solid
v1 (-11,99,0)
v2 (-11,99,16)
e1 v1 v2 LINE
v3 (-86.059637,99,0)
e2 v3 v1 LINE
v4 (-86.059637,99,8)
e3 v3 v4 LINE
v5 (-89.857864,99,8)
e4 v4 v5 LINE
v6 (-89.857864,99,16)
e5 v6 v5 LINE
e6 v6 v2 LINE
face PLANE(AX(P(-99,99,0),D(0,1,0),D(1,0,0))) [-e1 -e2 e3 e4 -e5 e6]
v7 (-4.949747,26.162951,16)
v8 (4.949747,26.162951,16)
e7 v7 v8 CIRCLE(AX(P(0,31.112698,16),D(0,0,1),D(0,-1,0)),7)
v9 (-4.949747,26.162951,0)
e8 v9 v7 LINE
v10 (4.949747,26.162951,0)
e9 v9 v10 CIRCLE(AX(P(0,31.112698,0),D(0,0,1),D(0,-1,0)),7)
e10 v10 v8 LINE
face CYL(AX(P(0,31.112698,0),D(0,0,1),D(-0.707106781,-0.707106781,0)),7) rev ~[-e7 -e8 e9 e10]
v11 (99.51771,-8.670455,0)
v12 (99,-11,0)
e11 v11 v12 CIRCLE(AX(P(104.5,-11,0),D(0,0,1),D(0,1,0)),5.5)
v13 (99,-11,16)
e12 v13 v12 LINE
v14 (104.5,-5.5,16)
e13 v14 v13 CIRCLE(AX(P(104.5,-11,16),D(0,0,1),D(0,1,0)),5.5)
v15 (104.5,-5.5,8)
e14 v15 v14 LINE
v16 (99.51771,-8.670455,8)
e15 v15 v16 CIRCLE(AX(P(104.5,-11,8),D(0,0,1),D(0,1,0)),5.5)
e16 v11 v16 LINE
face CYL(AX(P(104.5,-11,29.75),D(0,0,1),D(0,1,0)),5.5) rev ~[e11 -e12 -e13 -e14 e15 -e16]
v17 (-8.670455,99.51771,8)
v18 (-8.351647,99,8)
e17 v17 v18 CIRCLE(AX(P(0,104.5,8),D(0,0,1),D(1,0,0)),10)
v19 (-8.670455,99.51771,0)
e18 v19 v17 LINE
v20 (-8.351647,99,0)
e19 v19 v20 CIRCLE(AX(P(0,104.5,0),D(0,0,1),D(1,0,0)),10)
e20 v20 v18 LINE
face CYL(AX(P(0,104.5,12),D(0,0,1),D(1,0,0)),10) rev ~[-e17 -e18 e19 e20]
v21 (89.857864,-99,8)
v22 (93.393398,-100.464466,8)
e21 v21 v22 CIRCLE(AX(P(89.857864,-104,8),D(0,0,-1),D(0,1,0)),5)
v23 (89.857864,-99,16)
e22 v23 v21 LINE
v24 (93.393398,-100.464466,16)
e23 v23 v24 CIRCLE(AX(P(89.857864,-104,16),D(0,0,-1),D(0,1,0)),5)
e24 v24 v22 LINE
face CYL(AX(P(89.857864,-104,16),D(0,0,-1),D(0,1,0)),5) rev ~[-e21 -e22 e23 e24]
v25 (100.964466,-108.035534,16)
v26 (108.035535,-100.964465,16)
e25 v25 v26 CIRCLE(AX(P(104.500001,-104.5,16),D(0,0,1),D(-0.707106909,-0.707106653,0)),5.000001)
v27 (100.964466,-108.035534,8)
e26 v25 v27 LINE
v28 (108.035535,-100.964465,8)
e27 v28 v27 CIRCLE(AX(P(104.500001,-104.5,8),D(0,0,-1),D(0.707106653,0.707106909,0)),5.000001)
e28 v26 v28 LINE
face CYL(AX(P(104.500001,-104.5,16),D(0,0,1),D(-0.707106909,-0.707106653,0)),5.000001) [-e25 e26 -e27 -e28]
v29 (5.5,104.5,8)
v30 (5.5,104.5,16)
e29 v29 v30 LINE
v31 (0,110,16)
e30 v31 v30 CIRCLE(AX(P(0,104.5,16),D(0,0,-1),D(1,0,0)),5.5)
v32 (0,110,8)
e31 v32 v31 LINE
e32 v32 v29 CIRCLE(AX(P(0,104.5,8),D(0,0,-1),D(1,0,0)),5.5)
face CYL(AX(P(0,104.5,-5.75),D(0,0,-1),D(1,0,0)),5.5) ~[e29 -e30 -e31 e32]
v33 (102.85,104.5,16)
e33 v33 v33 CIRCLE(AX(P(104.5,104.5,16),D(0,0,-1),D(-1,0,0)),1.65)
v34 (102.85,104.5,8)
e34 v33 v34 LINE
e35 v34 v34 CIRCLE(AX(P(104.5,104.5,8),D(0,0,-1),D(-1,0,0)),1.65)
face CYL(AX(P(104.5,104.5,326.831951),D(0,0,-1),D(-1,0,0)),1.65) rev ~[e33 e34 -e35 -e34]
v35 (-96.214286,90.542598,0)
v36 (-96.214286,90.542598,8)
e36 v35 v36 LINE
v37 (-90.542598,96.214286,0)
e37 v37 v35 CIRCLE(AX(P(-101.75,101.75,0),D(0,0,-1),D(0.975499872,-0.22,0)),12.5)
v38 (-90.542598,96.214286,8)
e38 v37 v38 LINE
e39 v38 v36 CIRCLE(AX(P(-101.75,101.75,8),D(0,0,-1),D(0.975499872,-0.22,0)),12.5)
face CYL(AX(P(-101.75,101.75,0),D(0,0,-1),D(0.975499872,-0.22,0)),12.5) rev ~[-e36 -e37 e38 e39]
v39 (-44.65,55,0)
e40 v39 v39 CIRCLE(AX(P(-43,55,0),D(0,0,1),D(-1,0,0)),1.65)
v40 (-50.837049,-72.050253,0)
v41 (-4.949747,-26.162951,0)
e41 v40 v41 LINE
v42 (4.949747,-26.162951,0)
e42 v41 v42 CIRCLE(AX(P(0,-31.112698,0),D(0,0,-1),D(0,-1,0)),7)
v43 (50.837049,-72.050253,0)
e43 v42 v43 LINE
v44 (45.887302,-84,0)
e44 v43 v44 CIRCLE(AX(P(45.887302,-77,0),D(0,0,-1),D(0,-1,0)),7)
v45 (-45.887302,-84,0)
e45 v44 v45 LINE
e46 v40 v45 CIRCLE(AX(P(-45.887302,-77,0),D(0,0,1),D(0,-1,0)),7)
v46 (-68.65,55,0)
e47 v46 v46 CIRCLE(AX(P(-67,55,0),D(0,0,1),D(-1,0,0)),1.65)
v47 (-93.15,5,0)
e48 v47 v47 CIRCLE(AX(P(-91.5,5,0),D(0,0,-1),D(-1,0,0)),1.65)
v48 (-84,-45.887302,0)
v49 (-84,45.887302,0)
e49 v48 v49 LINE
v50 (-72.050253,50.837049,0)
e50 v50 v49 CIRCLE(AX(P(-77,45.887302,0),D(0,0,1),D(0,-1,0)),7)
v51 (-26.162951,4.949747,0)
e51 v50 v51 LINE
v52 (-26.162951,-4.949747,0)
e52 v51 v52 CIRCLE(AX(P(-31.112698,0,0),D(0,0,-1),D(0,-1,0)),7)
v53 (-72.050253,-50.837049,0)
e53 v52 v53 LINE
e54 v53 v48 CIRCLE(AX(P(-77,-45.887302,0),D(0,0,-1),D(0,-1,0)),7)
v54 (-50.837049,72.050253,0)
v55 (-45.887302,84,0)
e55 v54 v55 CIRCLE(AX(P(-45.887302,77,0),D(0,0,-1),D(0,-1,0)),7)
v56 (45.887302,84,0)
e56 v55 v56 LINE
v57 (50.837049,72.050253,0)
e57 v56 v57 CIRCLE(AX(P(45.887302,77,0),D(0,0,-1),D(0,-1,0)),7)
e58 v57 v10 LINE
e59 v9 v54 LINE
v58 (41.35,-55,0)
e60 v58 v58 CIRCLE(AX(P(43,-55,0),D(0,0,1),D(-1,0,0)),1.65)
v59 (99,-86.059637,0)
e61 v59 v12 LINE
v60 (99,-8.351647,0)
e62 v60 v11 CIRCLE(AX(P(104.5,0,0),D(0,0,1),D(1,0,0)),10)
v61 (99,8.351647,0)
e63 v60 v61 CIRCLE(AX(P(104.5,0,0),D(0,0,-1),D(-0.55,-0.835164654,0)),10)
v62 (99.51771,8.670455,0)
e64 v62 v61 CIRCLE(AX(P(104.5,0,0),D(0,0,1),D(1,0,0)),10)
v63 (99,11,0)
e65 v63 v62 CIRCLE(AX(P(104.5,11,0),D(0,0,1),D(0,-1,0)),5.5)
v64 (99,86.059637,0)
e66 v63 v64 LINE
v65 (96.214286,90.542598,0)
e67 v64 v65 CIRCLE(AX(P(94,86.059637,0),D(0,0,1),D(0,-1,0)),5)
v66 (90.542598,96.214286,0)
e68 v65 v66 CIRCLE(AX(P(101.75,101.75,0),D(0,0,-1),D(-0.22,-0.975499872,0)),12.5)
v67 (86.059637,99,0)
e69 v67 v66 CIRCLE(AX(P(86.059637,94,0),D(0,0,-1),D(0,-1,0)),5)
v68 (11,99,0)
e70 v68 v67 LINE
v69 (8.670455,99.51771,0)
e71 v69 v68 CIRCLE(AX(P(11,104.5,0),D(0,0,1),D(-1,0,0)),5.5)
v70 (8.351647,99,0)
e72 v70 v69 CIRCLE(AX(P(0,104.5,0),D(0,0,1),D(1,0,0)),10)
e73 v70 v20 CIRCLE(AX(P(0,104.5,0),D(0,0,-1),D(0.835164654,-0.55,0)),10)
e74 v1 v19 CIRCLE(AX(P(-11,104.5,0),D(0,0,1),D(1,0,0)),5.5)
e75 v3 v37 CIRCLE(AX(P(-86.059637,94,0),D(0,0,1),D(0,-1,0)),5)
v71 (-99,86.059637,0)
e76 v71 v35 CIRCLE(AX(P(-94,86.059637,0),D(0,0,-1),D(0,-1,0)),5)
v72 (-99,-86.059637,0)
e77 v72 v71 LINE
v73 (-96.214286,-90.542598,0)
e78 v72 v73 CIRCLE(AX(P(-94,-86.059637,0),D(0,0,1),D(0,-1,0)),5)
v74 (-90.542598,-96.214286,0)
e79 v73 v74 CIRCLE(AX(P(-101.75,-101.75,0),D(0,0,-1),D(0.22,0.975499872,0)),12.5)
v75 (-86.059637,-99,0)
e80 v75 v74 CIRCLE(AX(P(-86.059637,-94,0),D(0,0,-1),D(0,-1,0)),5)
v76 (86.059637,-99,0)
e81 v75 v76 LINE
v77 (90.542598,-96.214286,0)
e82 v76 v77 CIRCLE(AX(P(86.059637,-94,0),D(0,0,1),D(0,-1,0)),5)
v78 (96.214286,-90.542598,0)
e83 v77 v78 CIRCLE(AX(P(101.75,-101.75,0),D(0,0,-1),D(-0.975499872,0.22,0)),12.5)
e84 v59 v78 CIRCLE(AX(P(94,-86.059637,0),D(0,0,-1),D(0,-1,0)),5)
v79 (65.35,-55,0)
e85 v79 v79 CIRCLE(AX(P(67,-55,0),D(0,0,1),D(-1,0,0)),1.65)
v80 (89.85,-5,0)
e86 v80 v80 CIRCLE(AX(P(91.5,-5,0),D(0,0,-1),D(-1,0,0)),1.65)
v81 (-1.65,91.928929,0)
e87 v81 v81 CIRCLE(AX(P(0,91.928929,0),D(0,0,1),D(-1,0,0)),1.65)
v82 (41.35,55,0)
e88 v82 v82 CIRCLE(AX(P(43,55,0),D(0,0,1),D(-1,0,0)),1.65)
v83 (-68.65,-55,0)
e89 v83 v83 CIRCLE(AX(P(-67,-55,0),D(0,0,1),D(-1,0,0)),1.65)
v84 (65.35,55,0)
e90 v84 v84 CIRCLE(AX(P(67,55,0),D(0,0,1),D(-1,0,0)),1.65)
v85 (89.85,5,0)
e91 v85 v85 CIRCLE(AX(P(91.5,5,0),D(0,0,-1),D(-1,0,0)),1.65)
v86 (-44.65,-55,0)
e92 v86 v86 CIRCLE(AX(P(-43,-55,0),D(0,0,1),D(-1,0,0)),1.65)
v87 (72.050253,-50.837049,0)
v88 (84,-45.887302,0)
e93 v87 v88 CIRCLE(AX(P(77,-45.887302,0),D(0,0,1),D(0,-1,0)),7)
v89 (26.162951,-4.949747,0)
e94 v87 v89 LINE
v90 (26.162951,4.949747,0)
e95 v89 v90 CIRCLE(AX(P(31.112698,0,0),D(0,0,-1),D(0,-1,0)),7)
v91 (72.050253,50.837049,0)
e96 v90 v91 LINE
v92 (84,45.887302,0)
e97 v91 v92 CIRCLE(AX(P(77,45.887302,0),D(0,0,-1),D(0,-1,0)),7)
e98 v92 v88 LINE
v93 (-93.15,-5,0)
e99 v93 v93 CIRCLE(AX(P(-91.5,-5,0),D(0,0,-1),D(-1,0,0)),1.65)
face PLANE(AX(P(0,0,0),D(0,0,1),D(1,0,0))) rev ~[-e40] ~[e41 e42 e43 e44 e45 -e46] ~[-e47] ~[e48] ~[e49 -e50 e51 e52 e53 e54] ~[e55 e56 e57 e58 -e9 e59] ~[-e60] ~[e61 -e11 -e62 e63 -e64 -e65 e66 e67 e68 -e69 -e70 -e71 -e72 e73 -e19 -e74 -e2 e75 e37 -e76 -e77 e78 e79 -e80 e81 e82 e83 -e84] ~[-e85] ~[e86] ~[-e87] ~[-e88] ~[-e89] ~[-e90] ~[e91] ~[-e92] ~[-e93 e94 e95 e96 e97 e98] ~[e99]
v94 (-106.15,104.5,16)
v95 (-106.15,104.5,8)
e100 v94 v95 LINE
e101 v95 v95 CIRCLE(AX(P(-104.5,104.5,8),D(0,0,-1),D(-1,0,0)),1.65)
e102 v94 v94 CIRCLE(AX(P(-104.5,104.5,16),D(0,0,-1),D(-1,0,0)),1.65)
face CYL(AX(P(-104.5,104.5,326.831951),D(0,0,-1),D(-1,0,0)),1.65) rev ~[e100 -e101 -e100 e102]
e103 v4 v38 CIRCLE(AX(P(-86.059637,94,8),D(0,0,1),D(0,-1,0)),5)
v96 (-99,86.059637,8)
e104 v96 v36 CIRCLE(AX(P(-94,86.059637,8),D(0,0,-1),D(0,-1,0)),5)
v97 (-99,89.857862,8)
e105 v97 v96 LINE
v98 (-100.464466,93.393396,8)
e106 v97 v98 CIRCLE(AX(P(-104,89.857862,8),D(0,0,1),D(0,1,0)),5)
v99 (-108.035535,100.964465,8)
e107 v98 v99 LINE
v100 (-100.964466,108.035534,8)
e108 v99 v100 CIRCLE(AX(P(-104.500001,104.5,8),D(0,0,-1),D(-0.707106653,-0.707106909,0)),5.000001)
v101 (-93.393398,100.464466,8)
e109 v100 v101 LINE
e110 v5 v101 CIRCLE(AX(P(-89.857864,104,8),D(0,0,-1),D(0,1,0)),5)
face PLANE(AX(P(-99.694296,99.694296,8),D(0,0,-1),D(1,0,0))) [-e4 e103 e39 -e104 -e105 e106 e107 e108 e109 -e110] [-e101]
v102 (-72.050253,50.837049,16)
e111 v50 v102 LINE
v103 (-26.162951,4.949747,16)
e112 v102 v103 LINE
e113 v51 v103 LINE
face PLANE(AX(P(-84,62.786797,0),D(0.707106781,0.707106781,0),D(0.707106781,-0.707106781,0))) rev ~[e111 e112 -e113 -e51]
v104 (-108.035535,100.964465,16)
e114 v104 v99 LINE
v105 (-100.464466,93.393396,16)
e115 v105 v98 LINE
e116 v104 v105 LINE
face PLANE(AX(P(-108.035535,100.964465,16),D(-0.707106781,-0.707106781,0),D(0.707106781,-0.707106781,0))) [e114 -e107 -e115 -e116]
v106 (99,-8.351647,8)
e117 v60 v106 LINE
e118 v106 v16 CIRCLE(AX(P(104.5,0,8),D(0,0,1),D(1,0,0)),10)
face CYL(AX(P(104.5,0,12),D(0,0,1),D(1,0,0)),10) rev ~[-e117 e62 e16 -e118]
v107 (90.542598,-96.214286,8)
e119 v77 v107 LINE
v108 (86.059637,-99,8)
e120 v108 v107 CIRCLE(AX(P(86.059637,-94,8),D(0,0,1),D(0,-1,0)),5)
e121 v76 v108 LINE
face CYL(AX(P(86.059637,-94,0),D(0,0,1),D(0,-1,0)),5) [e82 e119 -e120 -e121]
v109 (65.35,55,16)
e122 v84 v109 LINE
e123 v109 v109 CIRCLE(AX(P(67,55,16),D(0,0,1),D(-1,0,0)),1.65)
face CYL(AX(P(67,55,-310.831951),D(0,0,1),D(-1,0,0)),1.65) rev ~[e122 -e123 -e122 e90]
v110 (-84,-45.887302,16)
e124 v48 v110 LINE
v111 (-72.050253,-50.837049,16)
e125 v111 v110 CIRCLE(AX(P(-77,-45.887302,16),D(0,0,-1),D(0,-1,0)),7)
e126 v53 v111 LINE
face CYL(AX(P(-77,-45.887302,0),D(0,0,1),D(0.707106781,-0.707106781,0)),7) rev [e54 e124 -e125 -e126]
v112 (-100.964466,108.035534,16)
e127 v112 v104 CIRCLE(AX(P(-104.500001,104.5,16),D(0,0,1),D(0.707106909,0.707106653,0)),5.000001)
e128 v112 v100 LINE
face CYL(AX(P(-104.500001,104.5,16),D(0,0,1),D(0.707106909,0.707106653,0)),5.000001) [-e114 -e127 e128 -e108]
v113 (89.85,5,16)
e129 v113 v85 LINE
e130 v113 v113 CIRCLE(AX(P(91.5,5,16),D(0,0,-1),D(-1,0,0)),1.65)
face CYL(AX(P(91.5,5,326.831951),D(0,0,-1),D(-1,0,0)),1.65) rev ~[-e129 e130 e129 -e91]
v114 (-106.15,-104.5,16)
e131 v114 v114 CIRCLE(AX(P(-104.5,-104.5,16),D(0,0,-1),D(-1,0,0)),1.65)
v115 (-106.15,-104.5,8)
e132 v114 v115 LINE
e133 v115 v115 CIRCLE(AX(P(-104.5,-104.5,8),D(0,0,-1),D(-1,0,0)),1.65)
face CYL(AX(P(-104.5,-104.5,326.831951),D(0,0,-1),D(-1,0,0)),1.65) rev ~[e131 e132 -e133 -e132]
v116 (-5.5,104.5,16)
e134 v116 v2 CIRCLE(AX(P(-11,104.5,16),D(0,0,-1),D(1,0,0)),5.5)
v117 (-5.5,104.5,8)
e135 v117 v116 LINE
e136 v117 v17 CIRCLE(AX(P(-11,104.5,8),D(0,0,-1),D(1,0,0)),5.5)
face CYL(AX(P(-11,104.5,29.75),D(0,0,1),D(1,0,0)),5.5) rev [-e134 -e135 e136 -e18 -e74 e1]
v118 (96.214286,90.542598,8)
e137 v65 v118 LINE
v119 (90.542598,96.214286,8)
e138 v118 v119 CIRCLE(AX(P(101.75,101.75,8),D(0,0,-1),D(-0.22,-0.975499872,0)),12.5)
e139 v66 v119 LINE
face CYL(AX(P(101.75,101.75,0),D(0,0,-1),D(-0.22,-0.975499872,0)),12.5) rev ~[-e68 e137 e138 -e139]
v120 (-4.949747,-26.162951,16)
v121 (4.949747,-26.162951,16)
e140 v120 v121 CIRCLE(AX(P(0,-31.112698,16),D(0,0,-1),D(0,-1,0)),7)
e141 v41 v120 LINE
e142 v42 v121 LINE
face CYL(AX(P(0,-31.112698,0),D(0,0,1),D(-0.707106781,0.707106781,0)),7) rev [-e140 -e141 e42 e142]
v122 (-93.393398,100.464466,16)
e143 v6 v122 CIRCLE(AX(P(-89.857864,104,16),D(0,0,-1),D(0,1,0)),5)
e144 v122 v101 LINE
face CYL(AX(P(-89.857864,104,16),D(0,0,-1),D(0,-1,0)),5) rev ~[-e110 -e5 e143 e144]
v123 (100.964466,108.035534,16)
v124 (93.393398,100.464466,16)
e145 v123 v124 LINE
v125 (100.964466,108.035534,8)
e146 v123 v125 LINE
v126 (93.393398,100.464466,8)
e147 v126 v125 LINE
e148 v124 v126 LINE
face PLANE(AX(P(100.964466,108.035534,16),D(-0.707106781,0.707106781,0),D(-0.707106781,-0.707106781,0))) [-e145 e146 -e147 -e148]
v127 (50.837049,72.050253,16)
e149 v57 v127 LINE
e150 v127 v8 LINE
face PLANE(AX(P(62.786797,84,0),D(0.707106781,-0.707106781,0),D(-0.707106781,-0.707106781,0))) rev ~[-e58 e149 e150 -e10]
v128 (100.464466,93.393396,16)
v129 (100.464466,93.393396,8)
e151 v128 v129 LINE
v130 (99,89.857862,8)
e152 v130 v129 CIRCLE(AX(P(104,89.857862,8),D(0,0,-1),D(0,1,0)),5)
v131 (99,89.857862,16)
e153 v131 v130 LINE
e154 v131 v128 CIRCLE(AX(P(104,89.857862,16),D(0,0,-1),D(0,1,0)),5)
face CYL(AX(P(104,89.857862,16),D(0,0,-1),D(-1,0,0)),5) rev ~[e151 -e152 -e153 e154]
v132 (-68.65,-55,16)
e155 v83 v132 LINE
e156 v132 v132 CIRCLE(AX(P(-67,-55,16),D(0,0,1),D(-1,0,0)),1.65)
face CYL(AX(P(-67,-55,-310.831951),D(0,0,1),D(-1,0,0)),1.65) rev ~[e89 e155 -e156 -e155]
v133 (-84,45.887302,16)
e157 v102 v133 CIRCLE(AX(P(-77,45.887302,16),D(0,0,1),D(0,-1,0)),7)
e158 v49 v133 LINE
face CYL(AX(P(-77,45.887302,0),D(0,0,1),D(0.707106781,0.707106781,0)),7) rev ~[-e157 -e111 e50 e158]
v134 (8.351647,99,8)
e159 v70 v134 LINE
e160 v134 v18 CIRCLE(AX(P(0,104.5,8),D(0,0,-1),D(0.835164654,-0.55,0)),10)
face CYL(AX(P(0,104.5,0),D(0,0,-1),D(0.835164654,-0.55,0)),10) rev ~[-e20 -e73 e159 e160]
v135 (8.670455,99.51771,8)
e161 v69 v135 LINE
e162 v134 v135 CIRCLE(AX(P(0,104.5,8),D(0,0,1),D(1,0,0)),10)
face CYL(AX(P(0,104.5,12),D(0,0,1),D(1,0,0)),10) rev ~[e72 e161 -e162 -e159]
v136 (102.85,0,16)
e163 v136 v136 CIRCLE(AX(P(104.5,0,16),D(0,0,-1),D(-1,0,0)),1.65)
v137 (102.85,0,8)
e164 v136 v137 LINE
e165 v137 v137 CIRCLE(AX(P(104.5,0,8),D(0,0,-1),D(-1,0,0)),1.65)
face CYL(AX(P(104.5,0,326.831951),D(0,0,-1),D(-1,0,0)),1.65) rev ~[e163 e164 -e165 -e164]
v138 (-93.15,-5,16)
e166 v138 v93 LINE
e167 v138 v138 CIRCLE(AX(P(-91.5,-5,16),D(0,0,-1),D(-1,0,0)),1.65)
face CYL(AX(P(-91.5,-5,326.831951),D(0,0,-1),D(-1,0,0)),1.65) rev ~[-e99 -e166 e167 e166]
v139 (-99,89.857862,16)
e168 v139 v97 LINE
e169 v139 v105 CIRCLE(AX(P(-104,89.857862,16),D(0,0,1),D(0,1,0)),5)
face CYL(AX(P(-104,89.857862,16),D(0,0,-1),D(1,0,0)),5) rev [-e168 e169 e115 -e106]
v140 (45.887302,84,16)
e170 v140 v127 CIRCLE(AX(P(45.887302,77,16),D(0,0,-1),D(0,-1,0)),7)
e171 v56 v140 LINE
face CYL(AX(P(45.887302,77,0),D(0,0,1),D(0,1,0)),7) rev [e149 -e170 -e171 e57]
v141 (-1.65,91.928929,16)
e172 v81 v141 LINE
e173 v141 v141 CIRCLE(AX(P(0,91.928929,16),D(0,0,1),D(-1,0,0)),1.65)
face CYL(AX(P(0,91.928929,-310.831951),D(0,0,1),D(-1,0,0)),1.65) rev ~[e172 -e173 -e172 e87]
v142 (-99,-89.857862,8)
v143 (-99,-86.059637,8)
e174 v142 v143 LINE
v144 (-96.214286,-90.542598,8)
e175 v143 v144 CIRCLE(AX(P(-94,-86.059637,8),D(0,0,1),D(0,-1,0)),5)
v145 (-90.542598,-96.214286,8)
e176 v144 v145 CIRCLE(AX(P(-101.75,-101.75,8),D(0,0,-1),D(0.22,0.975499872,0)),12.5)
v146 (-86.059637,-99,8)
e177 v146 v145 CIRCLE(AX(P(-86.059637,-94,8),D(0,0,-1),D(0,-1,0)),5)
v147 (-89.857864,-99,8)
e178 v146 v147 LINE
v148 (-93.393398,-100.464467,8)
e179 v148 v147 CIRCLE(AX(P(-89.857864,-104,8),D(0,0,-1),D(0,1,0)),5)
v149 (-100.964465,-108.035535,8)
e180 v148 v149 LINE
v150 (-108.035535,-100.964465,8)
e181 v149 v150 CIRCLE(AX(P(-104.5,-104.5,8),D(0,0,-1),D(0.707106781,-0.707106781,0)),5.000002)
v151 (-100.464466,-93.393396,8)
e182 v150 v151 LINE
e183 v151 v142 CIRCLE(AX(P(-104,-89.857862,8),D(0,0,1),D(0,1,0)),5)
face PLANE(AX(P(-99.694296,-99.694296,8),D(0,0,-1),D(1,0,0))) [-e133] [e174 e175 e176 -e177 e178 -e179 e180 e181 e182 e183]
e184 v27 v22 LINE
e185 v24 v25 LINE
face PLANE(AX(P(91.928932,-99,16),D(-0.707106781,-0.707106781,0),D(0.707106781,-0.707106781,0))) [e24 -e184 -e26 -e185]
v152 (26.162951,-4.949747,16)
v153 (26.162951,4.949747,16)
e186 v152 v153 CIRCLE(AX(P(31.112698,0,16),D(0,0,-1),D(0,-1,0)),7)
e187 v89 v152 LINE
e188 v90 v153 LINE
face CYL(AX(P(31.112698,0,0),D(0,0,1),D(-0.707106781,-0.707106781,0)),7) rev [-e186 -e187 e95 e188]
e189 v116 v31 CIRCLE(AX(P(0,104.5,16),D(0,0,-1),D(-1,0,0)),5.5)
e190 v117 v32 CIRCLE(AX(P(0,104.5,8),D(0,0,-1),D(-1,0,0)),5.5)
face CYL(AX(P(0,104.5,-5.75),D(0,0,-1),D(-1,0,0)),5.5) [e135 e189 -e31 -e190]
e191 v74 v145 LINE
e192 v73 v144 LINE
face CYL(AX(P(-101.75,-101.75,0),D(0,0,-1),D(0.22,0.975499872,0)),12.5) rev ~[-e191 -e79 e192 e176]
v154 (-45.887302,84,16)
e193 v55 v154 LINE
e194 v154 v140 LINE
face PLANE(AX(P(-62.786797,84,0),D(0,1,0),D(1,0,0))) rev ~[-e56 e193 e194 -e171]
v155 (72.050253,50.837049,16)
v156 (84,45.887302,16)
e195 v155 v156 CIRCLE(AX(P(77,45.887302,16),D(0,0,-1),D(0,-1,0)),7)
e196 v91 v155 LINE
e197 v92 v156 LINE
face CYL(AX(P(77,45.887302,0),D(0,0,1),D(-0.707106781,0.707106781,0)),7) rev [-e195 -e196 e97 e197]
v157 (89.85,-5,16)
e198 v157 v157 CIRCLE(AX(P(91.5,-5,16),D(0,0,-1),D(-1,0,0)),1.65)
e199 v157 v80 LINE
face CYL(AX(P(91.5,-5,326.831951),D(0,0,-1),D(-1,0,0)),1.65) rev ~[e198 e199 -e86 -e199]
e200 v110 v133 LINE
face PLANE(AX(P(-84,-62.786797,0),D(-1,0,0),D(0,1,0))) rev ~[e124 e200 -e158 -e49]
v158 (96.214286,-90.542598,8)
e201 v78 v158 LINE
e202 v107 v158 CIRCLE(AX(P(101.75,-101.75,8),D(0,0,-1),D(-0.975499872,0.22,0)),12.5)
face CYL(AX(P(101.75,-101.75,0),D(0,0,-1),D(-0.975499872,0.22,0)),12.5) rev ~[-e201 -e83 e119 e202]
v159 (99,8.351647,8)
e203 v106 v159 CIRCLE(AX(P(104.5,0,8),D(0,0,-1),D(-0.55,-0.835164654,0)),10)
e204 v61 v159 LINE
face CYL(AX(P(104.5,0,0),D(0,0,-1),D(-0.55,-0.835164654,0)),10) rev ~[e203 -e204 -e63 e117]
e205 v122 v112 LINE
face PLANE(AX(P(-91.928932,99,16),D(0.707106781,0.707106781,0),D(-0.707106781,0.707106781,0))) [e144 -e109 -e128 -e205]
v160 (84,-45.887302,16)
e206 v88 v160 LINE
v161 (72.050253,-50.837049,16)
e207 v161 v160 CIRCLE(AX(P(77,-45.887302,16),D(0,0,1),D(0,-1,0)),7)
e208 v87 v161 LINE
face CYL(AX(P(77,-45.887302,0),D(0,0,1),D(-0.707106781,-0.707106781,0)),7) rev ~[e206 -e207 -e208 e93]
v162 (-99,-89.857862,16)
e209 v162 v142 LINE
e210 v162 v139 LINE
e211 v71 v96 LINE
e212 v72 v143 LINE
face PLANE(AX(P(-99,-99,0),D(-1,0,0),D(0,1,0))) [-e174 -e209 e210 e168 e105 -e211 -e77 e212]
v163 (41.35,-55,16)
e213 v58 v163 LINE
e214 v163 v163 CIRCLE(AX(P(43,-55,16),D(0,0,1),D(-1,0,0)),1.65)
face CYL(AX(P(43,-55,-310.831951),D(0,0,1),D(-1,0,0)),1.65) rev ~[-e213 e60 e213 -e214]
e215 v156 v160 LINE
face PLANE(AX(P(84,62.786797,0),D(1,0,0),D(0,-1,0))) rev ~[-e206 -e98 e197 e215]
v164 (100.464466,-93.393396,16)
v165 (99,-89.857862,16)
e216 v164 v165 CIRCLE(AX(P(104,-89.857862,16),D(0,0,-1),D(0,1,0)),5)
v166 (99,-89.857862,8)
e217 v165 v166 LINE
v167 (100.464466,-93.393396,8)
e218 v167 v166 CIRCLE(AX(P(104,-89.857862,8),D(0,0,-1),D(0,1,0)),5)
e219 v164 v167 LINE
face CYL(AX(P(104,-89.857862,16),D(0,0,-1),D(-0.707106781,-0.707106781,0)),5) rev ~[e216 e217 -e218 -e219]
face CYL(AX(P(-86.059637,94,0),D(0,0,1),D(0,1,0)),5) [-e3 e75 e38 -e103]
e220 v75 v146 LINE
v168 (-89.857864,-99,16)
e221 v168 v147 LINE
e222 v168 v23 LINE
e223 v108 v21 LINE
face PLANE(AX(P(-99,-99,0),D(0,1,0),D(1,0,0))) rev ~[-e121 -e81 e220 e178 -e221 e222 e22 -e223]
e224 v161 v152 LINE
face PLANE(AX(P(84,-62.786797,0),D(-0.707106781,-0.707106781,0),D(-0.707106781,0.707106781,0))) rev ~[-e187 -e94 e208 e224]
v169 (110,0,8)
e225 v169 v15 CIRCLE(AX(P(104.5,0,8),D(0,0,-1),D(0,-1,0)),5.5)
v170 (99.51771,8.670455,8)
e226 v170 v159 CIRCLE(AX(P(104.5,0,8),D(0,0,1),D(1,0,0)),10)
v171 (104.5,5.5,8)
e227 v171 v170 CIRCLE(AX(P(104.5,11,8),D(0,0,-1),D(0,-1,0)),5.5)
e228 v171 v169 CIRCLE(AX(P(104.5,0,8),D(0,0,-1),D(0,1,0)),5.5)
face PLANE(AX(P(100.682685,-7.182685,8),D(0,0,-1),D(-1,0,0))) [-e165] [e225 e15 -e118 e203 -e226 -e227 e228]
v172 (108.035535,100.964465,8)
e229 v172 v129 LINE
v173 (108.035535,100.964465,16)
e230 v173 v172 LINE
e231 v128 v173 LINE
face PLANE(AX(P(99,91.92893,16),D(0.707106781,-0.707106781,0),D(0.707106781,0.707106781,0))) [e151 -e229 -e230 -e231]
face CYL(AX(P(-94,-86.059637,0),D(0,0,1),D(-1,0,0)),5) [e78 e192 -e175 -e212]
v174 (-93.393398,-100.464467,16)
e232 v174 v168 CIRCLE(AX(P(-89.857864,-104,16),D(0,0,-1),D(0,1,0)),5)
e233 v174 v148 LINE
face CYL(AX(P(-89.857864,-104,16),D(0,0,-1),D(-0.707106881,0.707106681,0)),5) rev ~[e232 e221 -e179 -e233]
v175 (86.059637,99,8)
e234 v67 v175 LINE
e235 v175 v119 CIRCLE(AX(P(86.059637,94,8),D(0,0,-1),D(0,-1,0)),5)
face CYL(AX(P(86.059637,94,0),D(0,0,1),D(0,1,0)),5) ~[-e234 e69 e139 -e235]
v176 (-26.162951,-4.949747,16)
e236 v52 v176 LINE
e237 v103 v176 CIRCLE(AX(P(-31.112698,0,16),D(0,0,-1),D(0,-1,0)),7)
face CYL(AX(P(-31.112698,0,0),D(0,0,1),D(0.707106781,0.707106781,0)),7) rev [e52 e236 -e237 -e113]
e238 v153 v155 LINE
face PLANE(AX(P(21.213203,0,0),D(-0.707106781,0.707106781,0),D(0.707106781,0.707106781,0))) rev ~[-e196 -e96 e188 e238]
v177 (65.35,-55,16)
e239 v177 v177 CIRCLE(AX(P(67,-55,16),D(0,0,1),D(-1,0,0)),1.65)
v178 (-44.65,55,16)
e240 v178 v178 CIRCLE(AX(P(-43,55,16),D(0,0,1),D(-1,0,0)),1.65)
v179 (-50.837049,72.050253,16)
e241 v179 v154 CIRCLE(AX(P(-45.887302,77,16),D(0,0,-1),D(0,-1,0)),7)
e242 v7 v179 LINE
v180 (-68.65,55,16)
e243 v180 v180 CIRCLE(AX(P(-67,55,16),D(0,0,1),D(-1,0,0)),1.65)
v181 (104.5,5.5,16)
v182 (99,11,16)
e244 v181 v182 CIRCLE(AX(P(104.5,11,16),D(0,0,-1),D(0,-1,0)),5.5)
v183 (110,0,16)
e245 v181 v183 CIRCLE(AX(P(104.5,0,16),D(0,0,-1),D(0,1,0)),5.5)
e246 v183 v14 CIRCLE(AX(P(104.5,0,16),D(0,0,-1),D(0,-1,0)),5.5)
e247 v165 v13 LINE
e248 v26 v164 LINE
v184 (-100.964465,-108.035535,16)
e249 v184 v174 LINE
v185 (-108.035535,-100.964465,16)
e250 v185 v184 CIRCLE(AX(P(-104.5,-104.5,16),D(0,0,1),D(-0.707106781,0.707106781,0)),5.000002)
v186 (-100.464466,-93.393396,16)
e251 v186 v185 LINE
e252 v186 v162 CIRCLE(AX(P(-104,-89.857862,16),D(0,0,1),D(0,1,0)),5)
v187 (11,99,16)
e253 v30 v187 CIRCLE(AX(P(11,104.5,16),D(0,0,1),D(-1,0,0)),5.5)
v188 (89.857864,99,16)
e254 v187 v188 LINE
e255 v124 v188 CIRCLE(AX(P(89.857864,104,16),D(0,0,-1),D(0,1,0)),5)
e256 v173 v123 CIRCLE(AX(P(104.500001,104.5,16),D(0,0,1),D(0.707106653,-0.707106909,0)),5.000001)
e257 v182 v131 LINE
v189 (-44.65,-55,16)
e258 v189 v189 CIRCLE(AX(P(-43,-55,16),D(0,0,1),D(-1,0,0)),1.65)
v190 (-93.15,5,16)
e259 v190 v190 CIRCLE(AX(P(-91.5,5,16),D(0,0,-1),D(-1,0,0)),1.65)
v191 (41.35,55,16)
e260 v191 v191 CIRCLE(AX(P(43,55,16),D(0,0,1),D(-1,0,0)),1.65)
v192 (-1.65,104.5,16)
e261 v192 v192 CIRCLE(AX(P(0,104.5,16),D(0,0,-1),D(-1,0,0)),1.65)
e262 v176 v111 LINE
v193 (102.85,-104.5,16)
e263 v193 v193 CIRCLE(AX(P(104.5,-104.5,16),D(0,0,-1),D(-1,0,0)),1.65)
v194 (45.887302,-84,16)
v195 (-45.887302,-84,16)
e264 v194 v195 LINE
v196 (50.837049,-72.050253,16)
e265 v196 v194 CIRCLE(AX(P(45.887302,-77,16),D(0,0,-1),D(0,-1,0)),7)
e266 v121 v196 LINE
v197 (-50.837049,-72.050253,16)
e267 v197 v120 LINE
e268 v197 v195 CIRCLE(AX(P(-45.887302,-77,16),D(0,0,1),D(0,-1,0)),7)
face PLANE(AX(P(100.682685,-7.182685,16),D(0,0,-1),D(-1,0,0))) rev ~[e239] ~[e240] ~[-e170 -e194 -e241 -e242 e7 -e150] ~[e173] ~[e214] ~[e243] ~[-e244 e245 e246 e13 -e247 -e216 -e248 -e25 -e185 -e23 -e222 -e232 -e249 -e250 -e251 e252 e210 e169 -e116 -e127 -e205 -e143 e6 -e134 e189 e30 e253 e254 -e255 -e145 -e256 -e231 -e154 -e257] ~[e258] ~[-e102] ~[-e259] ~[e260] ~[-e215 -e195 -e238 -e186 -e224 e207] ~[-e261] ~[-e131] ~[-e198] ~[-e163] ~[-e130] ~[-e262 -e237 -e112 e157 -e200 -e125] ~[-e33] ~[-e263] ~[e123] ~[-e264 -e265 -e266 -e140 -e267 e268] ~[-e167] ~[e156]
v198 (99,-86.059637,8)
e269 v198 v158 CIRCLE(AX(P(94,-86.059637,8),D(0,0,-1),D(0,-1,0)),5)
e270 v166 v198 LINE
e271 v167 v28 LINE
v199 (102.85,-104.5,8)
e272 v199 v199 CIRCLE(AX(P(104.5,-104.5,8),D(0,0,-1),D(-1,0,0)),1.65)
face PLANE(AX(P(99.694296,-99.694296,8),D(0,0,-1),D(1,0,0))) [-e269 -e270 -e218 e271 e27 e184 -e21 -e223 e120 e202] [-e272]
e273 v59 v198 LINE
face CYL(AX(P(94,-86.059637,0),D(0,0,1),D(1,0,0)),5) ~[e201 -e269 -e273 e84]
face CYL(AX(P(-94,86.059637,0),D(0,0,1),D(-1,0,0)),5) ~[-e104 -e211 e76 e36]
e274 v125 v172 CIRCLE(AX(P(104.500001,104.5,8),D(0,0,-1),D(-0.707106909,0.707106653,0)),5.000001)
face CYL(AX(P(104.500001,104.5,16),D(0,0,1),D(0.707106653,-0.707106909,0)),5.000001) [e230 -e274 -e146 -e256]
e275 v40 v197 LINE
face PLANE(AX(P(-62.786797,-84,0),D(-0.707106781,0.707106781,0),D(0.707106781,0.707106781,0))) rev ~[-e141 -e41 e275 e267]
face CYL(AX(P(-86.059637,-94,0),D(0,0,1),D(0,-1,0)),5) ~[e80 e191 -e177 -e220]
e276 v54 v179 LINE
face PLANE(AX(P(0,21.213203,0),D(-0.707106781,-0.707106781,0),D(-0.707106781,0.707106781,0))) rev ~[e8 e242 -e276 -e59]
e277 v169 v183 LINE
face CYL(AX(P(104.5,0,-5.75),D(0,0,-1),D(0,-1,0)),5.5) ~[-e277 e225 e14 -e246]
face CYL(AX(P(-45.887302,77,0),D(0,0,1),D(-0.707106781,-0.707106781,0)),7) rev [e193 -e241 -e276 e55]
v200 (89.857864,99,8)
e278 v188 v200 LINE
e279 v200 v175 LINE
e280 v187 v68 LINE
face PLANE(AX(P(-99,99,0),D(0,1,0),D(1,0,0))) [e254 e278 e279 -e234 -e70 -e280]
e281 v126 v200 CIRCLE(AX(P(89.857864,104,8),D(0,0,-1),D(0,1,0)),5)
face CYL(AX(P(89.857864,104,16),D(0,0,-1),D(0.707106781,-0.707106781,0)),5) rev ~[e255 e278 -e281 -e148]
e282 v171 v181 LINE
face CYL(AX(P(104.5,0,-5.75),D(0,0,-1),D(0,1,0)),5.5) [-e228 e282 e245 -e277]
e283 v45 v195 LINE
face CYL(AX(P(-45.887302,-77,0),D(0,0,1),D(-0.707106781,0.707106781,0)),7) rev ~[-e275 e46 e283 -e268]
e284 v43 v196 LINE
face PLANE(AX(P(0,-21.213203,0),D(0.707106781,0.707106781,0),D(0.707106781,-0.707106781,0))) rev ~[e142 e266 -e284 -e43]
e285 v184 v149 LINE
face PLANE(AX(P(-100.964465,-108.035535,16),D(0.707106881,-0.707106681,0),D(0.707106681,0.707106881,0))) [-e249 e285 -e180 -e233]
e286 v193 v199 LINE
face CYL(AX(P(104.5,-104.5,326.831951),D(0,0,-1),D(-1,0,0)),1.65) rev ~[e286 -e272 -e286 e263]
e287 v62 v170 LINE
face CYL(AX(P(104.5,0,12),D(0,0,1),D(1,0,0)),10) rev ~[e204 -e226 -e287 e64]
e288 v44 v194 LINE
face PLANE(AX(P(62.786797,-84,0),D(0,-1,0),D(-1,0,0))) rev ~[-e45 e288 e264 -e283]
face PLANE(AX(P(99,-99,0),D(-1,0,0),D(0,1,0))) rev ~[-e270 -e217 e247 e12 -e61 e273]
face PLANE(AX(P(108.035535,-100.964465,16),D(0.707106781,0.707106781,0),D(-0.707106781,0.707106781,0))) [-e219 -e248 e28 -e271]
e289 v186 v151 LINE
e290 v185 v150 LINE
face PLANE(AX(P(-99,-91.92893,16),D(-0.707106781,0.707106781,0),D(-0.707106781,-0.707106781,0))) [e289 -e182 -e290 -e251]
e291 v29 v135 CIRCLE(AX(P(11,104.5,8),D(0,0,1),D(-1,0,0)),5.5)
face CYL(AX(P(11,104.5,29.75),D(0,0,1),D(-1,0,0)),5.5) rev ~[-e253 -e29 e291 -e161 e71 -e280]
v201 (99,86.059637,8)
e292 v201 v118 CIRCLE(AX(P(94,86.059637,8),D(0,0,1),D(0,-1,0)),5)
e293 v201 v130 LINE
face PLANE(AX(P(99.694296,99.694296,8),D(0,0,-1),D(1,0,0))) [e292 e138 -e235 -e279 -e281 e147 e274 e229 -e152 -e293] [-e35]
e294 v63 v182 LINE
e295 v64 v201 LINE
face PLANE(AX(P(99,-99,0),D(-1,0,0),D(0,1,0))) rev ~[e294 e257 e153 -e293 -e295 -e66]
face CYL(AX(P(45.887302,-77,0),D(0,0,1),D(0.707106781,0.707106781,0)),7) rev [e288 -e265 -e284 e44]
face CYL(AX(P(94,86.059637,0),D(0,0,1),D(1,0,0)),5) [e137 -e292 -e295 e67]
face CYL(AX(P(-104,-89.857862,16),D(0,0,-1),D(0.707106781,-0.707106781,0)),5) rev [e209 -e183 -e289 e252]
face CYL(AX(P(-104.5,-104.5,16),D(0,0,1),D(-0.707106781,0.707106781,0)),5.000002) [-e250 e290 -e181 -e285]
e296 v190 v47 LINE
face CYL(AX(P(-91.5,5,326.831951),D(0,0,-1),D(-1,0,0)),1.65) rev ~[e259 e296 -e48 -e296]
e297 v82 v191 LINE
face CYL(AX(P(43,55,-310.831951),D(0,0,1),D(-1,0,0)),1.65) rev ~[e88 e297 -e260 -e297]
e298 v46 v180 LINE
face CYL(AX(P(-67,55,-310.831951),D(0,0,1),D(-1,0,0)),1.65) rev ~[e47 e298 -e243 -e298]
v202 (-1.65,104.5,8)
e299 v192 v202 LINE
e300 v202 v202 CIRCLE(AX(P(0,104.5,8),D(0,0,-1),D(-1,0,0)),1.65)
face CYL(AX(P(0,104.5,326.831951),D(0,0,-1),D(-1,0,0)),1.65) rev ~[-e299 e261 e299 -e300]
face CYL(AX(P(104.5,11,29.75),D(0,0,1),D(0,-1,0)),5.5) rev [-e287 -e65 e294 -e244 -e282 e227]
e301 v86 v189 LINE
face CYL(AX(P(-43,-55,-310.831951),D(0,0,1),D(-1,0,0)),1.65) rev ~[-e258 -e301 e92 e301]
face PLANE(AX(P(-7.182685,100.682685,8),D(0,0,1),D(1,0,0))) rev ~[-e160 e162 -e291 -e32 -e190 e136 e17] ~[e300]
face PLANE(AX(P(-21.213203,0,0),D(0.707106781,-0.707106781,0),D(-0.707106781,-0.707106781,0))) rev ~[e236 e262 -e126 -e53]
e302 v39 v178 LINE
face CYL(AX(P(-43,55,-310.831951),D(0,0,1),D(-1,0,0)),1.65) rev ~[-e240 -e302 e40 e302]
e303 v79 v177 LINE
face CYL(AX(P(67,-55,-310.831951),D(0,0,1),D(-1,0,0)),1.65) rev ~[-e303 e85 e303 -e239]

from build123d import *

# Parameters (mm, degrees)
F0_W         = 198
F0_H         = 198
F1_DEPTH     = 16
F2_W         = 11
F2_H         = 11
F3_DEPTH     = 16
F5_DEPTH     = 8
F6_R         = 5
F7_R         = 7
F8_T1_DEPTH  = 35.5
F8_T3_DEPTH  = 8
F8_T8_DEPTH  = 35.5
F8_S11_R     = 10
F8_T12_DEPTH = 20
F8_T16_DEPTH = 35.5
F8_S19_R     = 10
F8_T20_DEPTH = 20
F8_T24_DEPTH = 35.5
F8_S27_R     = 10
F8_T28_DEPTH = 20
F8_T32_DEPTH = 35.5
F8_S35_R     = 10
F8_T36_DEPTH = 20
F9_D         = 3.3
F10_D        = 3.3
F11_D        = 3.3


# Not quite as in the source:
# - a fillet or chamfer that OpenCascade refuses, or shapes differently, is made with other operations: its cross-section is extruded or revolved along the edge and cut away or added
# - ends of sketch curves that miss each other by under 0.0002 mm in the source are joined
# - a feature names something its author has since deleted; it is built from what else it names


with BuildPart() as f1:
    # F0 (on Top) → F1 (new body)
    with BuildSketch(Plane.XY):
        Rectangle(F0_W, F0_H)
        Polygon((-62.7867965644, -84), (0, -21.2132034356), (62.7867965644, -84), align=None, mode=Mode.SUBTRACT)
        Polygon((84, -62.7867965644), (21.2132034356, 0), (84, 62.7867965644), align=None, mode=Mode.SUBTRACT)
        Polygon((-84, 62.7867965644), (-21.2132034356, 0), (-84, -62.7867965644), align=None, mode=Mode.SUBTRACT)
        Polygon((62.7867965644, 84), (0, 21.2132034356), (-62.7867965644, 84), align=None, mode=Mode.SUBTRACT)
    extrude(amount=F1_DEPTH)

    # F2 (on face) → F3 (join, through all)
    with BuildSketch(Plane.XY.offset(16)):
        with BuildLine():
            Line((-99, -99), (-99, -91.9289296269))
            Line((-99, -91.9289296269), (-108.0355351865, -100.9644648135))
            ThreePointArc((-108.0355351865, -100.9644648135), (-108.0355351865, -108.0355351865), (-100.9644648135, -108.0355351865))
            Line((-100.9644648135, -108.0355351865), (-91.9289321881, -99))
            Line((-91.9289321881, -99), (-99, -99))
        make_face()
        with BuildLine():
            Line((99, -99), (91.9289321881, -99))
            Line((91.9289321881, -99), (100.9644660941, -108.0355339059))
            ThreePointArc((100.9644660941, -108.0355339059), (108.0355351865, -108.0355351865), (108.0355351865, -100.9644648135))
            Line((108.0355351865, -100.9644648135), (99, -91.9289296269))
            Line((99, -91.9289296269), (99, -99))
        make_face()
        with Locations((104.5, 0)):
            Rectangle(F2_W, F2_H)
        with BuildLine():
            Line((100.9644660941, 108.0355339059), (91.9289321881, 99))
            Line((91.9289321881, 99), (99, 99))
            Line((99, 99), (99, 91.9289296269))
            Line((99, 91.9289296269), (108.0355351865, 100.9644648135))
            ThreePointArc((108.0355351865, 100.9644648135), (108.0355351865, 108.0355351865), (100.9644660941, 108.0355339059))
        make_face()
        with BuildLine():
            Line((-99, 99), (-91.9289321881, 99))
            Line((-91.9289321881, 99), (-100.9644660941, 108.0355339059))
            ThreePointArc((-100.9644660941, 108.0355339059), (-108.0355351865, 108.0355351865), (-108.0355351865, 100.9644648135))
            Line((-108.0355351865, 100.9644648135), (-99, 91.9289296269))
            Line((-99, 91.9289296269), (-99, 99))
        make_face()
        with Locations((0, 104.5)):
            Rectangle(F2_W, F2_H)
    extrude(amount=-F3_DEPTH)

    # F4 (on face) → F5 (cut)
    with BuildSketch(Plane(origin=(0, 0, 0), x_dir=(1, 0, 0), z_dir=(0, 0, -1))):
        with BuildLine():
            Line((-99, 91.9289296269), (-99, 89.5562516017))
            ThreePointArc((-99, 89.5562516017), (-92.9111652352, 92.9111652352), (-89.5562516017, 99))
            Line((-89.5562516017, 99), (-91.9289321881, 99))
            Line((-91.9289321881, 99), (-100.9644648135, 108.0355351865))
            ThreePointArc((-100.9644648135, 108.0355351865), (-108.0355351865, 108.0355351865), (-108.0355351865, 100.9644648135))
            Line((-108.0355351865, 100.9644648135), (-99, 91.9289296269))
        make_face()
        with BuildLine():
            Line((91.9289321881, 99), (89.5562516017, 99))
            ThreePointArc((89.5562516017, 99), (92.9111652352, 92.9111652352), (99, 89.5562516017))
            Line((99, 89.5562516017), (99, 91.9289296269))
            Line((99, 91.9289296269), (108.0355351865, 100.9644648135))
            ThreePointArc((108.0355351865, 100.9644648135), (108.0355358268, 108.0355345462), (100.9644660941, 108.0355339059))
            Line((100.9644660941, 108.0355339059), (91.9289321881, 99))
        make_face()
        with BuildLine():
            ThreePointArc((-89.5562516017, -99), (-92.9111652352, -92.9111652352), (-99, -89.5562516017))
            Line((-99, -89.5562516017), (-99, -91.9289296269))
            Line((-99, -91.9289296269), (-108.0355351865, -100.9644648135))
            ThreePointArc((-108.0355351865, -100.9644648135), (-108.0355358268, -108.0355345462), (-100.9644660941, -108.0355339059))
            Line((-100.9644660941, -108.0355339059), (-91.9289321881, -99))
            Line((-91.9289321881, -99), (-89.5562516017, -99))
        make_face()
        with BuildLine():
            Line((99, 5.5), (99, 8.3516465442))
            ThreePointArc((99, 8.3516465442), (94.5, 0), (99, -8.3516465442))
            Line((99, -8.3516465442), (99, -5.5))
            Line((99, -5.5), (110, -5.5))
            Line((110, -5.5), (110, 5.5))
            Line((110, 5.5), (99, 5.5))
        make_face()
        with BuildLine():
            ThreePointArc((114.5, 0), (109.2434164903, 8.8034084308), (99, 8.3516465442))
            Line((99, 8.3516465442), (99, 5.5))
            Line((99, 5.5), (110, 5.5))
            Line((110, 5.5), (110, -5.5))
            Line((110, -5.5), (99, -5.5))
            Line((99, -5.5), (99, -8.3516465442))
            ThreePointArc((99, -8.3516465442), (109.2434164903, -8.8034084308), (114.5, 0))
        make_face()
        with BuildLine():
            Line((-5.5, -99), (-8.3516465442, -99))
            ThreePointArc((-8.3516465442, -99), (-2.8708478327, -114.0790517652), (10, -104.5))
            ThreePointArc((10, -104.5), (9.5790517652, -101.6291521673), (8.3516465442, -99))
            Line((8.3516465442, -99), (5.5, -99))
            Line((5.5, -99), (5.5, -110))
            Line((5.5, -110), (-5.5, -110))
            Line((-5.5, -110), (-5.5, -99))
        make_face()
        with BuildLine():
            ThreePointArc((8.3516465442, -99), (0, -94.5), (-8.3516465442, -99))
            Line((-8.3516465442, -99), (-5.5, -99))
            Line((-5.5, -99), (-5.5, -110))
            Line((-5.5, -110), (5.5, -110))
            Line((5.5, -110), (5.5, -99))
            Line((5.5, -99), (8.3516465442, -99))
        make_face()
        with BuildLine():
            Line((99, -91.9289296269), (99, -89.5562516017))
            ThreePointArc((99, -89.5562516017), (92.9111652352, -92.9111652352), (89.5562516017, -99))
            Line((89.5562516017, -99), (91.9289321881, -99))
            Line((91.9289321881, -99), (100.9644660941, -108.0355339059))
            ThreePointArc((100.9644660941, -108.0355339059), (108.0355358268, -108.0355345462), (108.0355351865, -100.9644648135))
            Line((108.0355351865, -100.9644648135), (99, -91.9289296269))
        make_face()
    extrude(amount=-F5_DEPTH, mode=Mode.SUBTRACT)

    # F6
    f6_edges = [f1.edges().sort_by_distance(p)[0] for p in [
        (-91.928932, 99, 12),
        (-99, 91.92893, 12),
        (-99, -91.92893, 12),
        (-91.928932, -99, 12),
        (91.928932, -99, 12),
        (99, -91.92893, 12),
        (99, 91.92893, 12),
        (91.928932, 99, 12),
        (89.556252, 99, 4),
        (99, 89.556252, 4),
        (99, -89.556252, 4),
        (89.556252, -99, 4),
        (-89.556252, -99, 4),
        (-99, -89.556252, 4),
        (-89.556252, 99, 4),
        (-99, 89.556252, 4),
    ]]
    fillet(f6_edges, radius=F6_R)

    # F7
    f7_edges = [f1.edges().sort_by_distance(p)[0] for p in [
        (-84, -62.786797, 8),
        (-84, 62.786797, 8),
        (-21.213203, 0, 8),
        (62.786797, -84, 8),
        (-62.786797, -84, 8),
        (0, -21.213203, 8),
        (21.213203, 0, 8),
        (84, -62.786797, 8),
        (84, 62.786797, 8),
        (62.786797, 84, 8),
        (0, 21.213203, 8),
        (-62.786797, 84, 8),
    ]]
    fillet(f7_edges, radius=F7_R)

    # F8: fillet of radius 5.5 on 8 edges, made by hand

    # F8_s2 → F8_t1 (cut)
    with BuildSketch(Plane.XY.offset(-5.75)):
        with BuildLine():
            ThreePointArc((104.5, -5.5), (108.3890872965, -3.8890872965), (110, 0))
            Line((110, 0), (110, -5.5))
            Line((110, -5.5), (104.5, -5.5))
        make_face()
        with BuildLine():
            ThreePointArc((104.5, 5.5), (108.3890872965, 3.8890872965), (110, 0))
            Line((110, 0), (110, 5.5))
            Line((110, 5.5), (104.5, 5.5))
        make_face()
        with BuildLine():
            ThreePointArc((-5.5, 104.5), (-3.8890872965, 108.3890872965), (0, 110))
            Line((0, 110), (-5.5, 110))
            Line((-5.5, 110), (-5.5, 104.5))
        make_face()
        with BuildLine():
            ThreePointArc((5.5, 104.5), (3.8890872965, 108.3890872965), (0, 110))
            Line((0, 110), (5.5, 110))
            Line((5.5, 110), (5.5, 104.5))
        make_face()
    extrude(amount=F8_T1_DEPTH, mode=Mode.SUBTRACT)

    # F8_s4 → F8_t3 (join)
    with BuildSketch(Plane.XY.offset(8)):
        with BuildLine():
            ThreePointArc((104.5, -5.5), (100.6109127035, -7.1109127035), (99, -11))
            Line((99, -11), (99, -5.5))
            Line((99, -5.5), (104.5, -5.5))
        make_face()
        with BuildLine():
            ThreePointArc((104.5, 5.5), (100.6109127035, 7.1109127035), (99, 11))
            Line((99, 11), (99, 5.5))
            Line((99, 5.5), (104.5, 5.5))
        make_face()
        with BuildLine():
            ThreePointArc((-5.5, 104.5), (-7.1109127035, 100.6109127035), (-11, 99))
            Line((-11, 99), (-5.5, 99))
            Line((-5.5, 99), (-5.5, 104.5))
        make_face()
        with BuildLine():
            ThreePointArc((5.5, 104.5), (7.1109127035, 100.6109127035), (11, 99))
            Line((11, 99), (5.5, 99))
            Line((5.5, 99), (5.5, 104.5))
        make_face()
    extrude(amount=F8_T3_DEPTH)


with BuildPart() as f8_tool6:
    # F8_s7 → F8_t8 (new body)
    with BuildSketch(Plane.XY.offset(29.75)):
        with BuildLine():
            ThreePointArc((104.5, -5.5), (100.6109127035, -7.1109127035), (99, -11))
            Line((99, -11), (99, -5.5))
            Line((99, -5.5), (104.5, -5.5))
        make_face()
    extrude(amount=-F8_T8_DEPTH)

    split(bisect_by=Plane.XY, keep=Keep.TOP)

    split(bisect_by=Plane.XY.offset(8), keep=Keep.BOTTOM)

    # F8_s11 → F8_t12 (cut, symmetric)
    with BuildSketch(Plane.XY.offset(12)):
        with Locations((104.5, 0)):
            Circle(F8_S11_R)
    extrude(amount=F8_T12_DEPTH, both=True, mode=Mode.SUBTRACT)


with BuildPart() as f1_1:
    add(f1.part)

    # F8_t5: union F8_tool6
    add(f8_tool6.part)


with BuildPart() as f8_tool14:
    # F8_s15 → F8_t16 (new body)
    with BuildSketch(Plane.XY.offset(29.75)):
        with BuildLine():
            ThreePointArc((104.5, 5.5), (100.6109127035, 7.1109127035), (99, 11))
            Line((99, 11), (99, 5.5))
            Line((99, 5.5), (104.5, 5.5))
        make_face()
    extrude(amount=-F8_T16_DEPTH)

    split(bisect_by=Plane.XY, keep=Keep.TOP)

    split(bisect_by=Plane.XY.offset(8), keep=Keep.BOTTOM)

    # F8_s19 → F8_t20 (cut, symmetric)
    with BuildSketch(Plane.XY.offset(12)):
        with Locations((104.5, 0)):
            Circle(F8_S19_R)
    extrude(amount=F8_T20_DEPTH, both=True, mode=Mode.SUBTRACT)


with BuildPart() as f1_2:
    add(f1_1.part)

    # F8_t13: union F8_tool14
    add(f8_tool14.part)


with BuildPart() as f8_tool22:
    # F8_s23 → F8_t24 (new body)
    with BuildSketch(Plane.XY.offset(29.75)):
        with BuildLine():
            ThreePointArc((-5.5, 104.5), (-7.1109127035, 100.6109127035), (-11, 99))
            Line((-11, 99), (-5.5, 99))
            Line((-5.5, 99), (-5.5, 104.5))
        make_face()
    extrude(amount=-F8_T24_DEPTH)

    split(bisect_by=Plane.XY, keep=Keep.TOP)

    split(bisect_by=Plane.XY.offset(8), keep=Keep.BOTTOM)

    # F8_s27 → F8_t28 (cut, symmetric)
    with BuildSketch(Plane.XY.offset(12)):
        with Locations((0, 104.5)):
            Circle(F8_S27_R)
    extrude(amount=F8_T28_DEPTH, both=True, mode=Mode.SUBTRACT)


with BuildPart() as f1_3:
    add(f1_2.part)

    # F8_t21: union F8_tool22
    add(f8_tool22.part)


with BuildPart() as f8_tool30:
    # F8_s31 → F8_t32 (new body)
    with BuildSketch(Plane.XY.offset(29.75)):
        with BuildLine():
            ThreePointArc((5.5, 104.5), (7.1109127035, 100.6109127035), (11, 99))
            Line((11, 99), (5.5, 99))
            Line((5.5, 99), (5.5, 104.5))
        make_face()
    extrude(amount=-F8_T32_DEPTH)

    split(bisect_by=Plane.XY, keep=Keep.TOP)

    split(bisect_by=Plane.XY.offset(8), keep=Keep.BOTTOM)

    # F8_s35 → F8_t36 (cut, symmetric)
    with BuildSketch(Plane.XY.offset(12)):
        with Locations((0, 104.5)):
            Circle(F8_S35_R)
    extrude(amount=F8_T36_DEPTH, both=True, mode=Mode.SUBTRACT)


with BuildPart() as f1_4:
    add(f1_3.part)

    # F8_t29: union F8_tool30
    add(f8_tool30.part)

    # F9 (through all)
    with Locations(Plane.XY.offset(16)):
        with Locations((104.5, 104.5), (-104.5, 104.5), (-104.5, -104.5), (104.5, -104.5), (0, 104.5), (104.5, 0), (91.5, -5), (91.5, 5), (-91.5, -5), (-91.5, 5)):
            Hole(F9_D / 2)

    # F10 (through all)
    with Locations(Plane(origin=(0, 0, 0), x_dir=(1, 0, 0), z_dir=(0, 0, -1))):
        with Locations((67, 55), (43, 55), (-43, 55), (-67, 55), (-67, -55), (-43, -55), (43, -55), (67, -55)):
            Hole(F10_D / 2)

    # F11 (through all)
    with Locations(Plane(origin=(0, 0, 0), x_dir=(1, 0, 0), z_dir=(0, 0, -1))):
        with Locations((0, -91.9289290905)):
            Hole(F11_D / 2)


solid = f1_4.part
